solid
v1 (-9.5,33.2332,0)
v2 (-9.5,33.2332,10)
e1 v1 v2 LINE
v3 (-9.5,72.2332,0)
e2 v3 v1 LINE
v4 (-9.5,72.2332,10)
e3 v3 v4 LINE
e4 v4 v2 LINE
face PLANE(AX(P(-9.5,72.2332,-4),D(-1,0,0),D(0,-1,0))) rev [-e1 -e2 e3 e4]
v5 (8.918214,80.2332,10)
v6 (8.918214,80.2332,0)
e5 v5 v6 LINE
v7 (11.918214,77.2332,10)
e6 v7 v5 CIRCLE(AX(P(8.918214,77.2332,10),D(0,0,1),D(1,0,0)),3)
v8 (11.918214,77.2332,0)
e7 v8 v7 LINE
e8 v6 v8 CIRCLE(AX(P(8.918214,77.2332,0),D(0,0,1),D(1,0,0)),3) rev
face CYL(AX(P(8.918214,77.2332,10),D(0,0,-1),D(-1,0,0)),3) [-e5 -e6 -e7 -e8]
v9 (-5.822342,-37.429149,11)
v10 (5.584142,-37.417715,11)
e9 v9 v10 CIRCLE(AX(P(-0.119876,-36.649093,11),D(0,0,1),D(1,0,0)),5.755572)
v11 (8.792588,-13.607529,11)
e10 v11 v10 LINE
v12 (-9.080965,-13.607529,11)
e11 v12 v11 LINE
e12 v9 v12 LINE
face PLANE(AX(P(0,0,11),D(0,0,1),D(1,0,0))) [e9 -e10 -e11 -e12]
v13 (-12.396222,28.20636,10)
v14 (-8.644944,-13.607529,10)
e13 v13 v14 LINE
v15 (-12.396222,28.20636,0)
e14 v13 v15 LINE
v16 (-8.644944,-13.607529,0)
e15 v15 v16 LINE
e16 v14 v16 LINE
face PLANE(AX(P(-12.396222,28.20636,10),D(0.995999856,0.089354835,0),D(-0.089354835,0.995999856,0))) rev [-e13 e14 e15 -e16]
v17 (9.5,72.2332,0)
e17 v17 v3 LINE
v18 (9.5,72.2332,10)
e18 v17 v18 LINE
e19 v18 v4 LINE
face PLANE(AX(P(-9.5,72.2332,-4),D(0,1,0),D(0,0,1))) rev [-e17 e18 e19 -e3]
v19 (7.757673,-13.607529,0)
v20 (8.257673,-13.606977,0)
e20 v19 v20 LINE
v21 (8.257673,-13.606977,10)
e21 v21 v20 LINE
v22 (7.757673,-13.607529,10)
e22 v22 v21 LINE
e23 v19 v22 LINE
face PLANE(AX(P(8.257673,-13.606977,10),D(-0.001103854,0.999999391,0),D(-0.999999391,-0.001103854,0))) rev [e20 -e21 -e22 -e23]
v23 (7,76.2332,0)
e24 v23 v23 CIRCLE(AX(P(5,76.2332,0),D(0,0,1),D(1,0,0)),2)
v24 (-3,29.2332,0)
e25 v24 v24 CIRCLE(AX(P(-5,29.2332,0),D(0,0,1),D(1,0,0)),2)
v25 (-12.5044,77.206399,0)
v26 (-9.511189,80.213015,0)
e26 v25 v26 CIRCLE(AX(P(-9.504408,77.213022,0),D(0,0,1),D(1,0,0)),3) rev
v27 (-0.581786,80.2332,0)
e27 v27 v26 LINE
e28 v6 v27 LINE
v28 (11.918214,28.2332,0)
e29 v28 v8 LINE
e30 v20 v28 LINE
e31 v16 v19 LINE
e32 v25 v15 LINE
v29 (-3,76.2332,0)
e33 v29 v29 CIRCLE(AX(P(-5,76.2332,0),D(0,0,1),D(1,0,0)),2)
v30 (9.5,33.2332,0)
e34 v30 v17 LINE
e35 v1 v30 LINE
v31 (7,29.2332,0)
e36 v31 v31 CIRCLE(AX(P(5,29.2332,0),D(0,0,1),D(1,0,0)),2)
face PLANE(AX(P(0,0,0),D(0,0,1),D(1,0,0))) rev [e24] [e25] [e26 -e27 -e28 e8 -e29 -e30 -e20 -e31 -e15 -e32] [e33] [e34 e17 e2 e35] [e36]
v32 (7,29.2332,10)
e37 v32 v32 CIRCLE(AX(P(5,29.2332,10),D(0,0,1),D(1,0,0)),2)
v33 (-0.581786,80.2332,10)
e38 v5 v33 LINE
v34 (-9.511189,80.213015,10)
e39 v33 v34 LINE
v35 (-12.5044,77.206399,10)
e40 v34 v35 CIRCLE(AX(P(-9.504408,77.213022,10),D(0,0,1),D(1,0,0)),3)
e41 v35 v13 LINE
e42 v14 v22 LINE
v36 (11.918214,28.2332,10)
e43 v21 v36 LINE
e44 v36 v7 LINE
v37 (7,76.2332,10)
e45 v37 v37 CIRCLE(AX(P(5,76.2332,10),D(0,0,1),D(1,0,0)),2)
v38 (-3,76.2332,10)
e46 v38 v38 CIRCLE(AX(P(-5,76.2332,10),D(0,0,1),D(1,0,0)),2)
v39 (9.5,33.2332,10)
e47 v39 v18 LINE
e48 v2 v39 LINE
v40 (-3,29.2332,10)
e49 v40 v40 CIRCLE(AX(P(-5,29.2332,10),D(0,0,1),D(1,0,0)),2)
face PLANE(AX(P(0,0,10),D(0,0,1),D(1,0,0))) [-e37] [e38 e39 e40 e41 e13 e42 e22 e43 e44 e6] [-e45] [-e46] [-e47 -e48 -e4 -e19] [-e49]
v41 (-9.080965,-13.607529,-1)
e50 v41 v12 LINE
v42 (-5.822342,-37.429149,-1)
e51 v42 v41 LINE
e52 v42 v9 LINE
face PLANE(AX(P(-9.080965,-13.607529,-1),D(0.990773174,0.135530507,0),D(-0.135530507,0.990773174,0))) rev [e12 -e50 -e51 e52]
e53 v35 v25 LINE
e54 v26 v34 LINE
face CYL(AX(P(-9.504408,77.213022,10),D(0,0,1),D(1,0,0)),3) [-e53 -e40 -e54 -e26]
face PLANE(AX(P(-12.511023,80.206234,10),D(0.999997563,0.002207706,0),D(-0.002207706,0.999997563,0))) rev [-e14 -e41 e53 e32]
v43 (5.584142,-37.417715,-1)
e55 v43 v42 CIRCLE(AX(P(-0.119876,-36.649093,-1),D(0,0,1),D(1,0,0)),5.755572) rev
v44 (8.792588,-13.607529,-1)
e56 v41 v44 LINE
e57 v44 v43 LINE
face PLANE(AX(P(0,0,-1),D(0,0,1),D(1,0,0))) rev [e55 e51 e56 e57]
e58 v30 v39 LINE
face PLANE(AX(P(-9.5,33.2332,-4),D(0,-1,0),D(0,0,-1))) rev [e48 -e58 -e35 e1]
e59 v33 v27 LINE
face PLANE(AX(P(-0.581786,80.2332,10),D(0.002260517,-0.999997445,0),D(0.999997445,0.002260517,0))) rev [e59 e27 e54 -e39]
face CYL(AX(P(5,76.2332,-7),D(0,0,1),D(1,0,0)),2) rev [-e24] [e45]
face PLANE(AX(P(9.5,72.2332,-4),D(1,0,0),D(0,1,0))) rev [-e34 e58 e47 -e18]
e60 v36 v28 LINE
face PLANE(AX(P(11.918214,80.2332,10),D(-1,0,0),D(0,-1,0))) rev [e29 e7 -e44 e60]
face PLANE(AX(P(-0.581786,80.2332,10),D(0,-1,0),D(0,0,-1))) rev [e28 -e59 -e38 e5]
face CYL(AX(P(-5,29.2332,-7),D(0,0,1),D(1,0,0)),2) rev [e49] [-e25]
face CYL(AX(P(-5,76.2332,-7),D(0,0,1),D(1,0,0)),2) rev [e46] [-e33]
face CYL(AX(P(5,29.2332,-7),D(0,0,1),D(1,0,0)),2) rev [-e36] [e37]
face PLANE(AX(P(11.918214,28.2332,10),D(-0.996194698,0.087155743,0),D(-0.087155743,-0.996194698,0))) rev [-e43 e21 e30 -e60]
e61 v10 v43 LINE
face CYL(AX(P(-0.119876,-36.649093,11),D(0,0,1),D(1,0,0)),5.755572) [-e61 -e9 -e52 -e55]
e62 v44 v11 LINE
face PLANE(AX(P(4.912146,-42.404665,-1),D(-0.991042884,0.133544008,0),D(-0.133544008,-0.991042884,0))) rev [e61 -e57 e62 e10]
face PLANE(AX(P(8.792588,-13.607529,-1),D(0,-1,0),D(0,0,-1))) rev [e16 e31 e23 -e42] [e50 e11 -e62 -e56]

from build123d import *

# Parameters (mm, degrees)
BOSS_EXTRU_1_DEPTH           = 10
ESQUISSE2_W                  = 19
ESQUISSE2_H                  = 39
ENL_V_MAT_EXTRU_1_DEPTH      = 14
ENL_V_MAT_EXTRU_2_DEPTH      = 15
ENL_V_MAT_EXTRU_2_DEPTH_BACK = 7
ESQUISSE3_R                  = 2
CONG_1_R                     = 3
CONG_2_R                     = 3
BOSS_EXTRU_4_DEPTH           = 1
BOSS_EXTRU_4_DEPTH_BACK      = 11
CONG_4_R                     = 5.755572


with BuildPart() as part:
    # Esquisse1 → Boss.-Extru.1 (new body)
    with BuildSketch(Plane.XY):
        Polygon((-0.581785688, 80.233199881), (11.918214312, 80.233199881), (11.918214312, 28.233199881), (8.257673117, -13.606977439), (7.257673726, -13.608081293), (3.5, -40.345319149), (0, -40.345319149), (-3.826627386, -40.353406678), (-7.643319911, -13.624529819), (-8.643319302, -13.625633672), (-12.396222382, 28.206360286), (-12.511023087, 80.206233562), align=None)
    extrude(amount=BOSS_EXTRU_1_DEPTH)

    # Esquisse2 → Enlèv. mat.-Extru.1 (cut)
    with BuildSketch(Plane.XY.offset(10)):
        with Locations((0, 52.733199881)):
            Rectangle(ESQUISSE2_W, ESQUISSE2_H)
    extrude(amount=-ENL_V_MAT_EXTRU_1_DEPTH, mode=Mode.SUBTRACT)

    # Esquisse3 → Enlèv. mat.-Extru.2 (cut, two sides: drawn at the far end of the back side and taken through both)
    with BuildSketch(Plane.XY.offset(-ENL_V_MAT_EXTRU_2_DEPTH_BACK)):
        with Locations((5, 76.233199881)):
            Circle(ESQUISSE3_R)
        with Locations((5, 29.233199881)):
            Circle(ESQUISSE3_R)
        with Locations((-5, 29.233199881)):
            Circle(ESQUISSE3_R)
        with Locations((-5, 76.233199881)):
            Circle(ESQUISSE3_R)
    extrude(amount=ENL_V_MAT_EXTRU_2_DEPTH + ENL_V_MAT_EXTRU_2_DEPTH_BACK, mode=Mode.SUBTRACT)

    # Congé1
    cong_1_edges = [part.edges().sort_by_distance(p)[0] for p in [
        (11.918214312, 80.233199881, 5),
    ]]
    fillet(cong_1_edges, radius=CONG_1_R)

    # Congé2
    cong_2_edges = [part.edges().sort_by_distance(p)[0] for p in [
        (-12.511023087, 80.206233562, 5),
    ]]
    fillet(cong_2_edges, radius=CONG_2_R)

    # Esquisse4 → Boss.-Extru.4 (add, two sides: drawn at the far end of the back side and taken through both)
    with BuildSketch(Plane(origin=(0, 0, 0), x_dir=(-1, 0, 0), z_dir=(0, 0, -1)).offset(-BOSS_EXTRU_4_DEPTH_BACK)):
        Polygon((-8.792588162, -13.607529366), (9.080964972, -13.607529366), (5.141727933, -42.4046649), (-4.912145705, -42.4046649), align=None)
    extrude(amount=BOSS_EXTRU_4_DEPTH + BOSS_EXTRU_4_DEPTH_BACK)

    # Congé4
    cong_4_edges = [part.edges().sort_by_distance(p)[0] for p in [
        (4.912145705, -42.4046649, 5),
        (-5.141727933, -42.4046649, 5),
    ]]
    fillet(cong_4_edges, radius=CONG_4_R - 0.0001)  # a hair under: the kernel refuses the full size


solid = part.part
